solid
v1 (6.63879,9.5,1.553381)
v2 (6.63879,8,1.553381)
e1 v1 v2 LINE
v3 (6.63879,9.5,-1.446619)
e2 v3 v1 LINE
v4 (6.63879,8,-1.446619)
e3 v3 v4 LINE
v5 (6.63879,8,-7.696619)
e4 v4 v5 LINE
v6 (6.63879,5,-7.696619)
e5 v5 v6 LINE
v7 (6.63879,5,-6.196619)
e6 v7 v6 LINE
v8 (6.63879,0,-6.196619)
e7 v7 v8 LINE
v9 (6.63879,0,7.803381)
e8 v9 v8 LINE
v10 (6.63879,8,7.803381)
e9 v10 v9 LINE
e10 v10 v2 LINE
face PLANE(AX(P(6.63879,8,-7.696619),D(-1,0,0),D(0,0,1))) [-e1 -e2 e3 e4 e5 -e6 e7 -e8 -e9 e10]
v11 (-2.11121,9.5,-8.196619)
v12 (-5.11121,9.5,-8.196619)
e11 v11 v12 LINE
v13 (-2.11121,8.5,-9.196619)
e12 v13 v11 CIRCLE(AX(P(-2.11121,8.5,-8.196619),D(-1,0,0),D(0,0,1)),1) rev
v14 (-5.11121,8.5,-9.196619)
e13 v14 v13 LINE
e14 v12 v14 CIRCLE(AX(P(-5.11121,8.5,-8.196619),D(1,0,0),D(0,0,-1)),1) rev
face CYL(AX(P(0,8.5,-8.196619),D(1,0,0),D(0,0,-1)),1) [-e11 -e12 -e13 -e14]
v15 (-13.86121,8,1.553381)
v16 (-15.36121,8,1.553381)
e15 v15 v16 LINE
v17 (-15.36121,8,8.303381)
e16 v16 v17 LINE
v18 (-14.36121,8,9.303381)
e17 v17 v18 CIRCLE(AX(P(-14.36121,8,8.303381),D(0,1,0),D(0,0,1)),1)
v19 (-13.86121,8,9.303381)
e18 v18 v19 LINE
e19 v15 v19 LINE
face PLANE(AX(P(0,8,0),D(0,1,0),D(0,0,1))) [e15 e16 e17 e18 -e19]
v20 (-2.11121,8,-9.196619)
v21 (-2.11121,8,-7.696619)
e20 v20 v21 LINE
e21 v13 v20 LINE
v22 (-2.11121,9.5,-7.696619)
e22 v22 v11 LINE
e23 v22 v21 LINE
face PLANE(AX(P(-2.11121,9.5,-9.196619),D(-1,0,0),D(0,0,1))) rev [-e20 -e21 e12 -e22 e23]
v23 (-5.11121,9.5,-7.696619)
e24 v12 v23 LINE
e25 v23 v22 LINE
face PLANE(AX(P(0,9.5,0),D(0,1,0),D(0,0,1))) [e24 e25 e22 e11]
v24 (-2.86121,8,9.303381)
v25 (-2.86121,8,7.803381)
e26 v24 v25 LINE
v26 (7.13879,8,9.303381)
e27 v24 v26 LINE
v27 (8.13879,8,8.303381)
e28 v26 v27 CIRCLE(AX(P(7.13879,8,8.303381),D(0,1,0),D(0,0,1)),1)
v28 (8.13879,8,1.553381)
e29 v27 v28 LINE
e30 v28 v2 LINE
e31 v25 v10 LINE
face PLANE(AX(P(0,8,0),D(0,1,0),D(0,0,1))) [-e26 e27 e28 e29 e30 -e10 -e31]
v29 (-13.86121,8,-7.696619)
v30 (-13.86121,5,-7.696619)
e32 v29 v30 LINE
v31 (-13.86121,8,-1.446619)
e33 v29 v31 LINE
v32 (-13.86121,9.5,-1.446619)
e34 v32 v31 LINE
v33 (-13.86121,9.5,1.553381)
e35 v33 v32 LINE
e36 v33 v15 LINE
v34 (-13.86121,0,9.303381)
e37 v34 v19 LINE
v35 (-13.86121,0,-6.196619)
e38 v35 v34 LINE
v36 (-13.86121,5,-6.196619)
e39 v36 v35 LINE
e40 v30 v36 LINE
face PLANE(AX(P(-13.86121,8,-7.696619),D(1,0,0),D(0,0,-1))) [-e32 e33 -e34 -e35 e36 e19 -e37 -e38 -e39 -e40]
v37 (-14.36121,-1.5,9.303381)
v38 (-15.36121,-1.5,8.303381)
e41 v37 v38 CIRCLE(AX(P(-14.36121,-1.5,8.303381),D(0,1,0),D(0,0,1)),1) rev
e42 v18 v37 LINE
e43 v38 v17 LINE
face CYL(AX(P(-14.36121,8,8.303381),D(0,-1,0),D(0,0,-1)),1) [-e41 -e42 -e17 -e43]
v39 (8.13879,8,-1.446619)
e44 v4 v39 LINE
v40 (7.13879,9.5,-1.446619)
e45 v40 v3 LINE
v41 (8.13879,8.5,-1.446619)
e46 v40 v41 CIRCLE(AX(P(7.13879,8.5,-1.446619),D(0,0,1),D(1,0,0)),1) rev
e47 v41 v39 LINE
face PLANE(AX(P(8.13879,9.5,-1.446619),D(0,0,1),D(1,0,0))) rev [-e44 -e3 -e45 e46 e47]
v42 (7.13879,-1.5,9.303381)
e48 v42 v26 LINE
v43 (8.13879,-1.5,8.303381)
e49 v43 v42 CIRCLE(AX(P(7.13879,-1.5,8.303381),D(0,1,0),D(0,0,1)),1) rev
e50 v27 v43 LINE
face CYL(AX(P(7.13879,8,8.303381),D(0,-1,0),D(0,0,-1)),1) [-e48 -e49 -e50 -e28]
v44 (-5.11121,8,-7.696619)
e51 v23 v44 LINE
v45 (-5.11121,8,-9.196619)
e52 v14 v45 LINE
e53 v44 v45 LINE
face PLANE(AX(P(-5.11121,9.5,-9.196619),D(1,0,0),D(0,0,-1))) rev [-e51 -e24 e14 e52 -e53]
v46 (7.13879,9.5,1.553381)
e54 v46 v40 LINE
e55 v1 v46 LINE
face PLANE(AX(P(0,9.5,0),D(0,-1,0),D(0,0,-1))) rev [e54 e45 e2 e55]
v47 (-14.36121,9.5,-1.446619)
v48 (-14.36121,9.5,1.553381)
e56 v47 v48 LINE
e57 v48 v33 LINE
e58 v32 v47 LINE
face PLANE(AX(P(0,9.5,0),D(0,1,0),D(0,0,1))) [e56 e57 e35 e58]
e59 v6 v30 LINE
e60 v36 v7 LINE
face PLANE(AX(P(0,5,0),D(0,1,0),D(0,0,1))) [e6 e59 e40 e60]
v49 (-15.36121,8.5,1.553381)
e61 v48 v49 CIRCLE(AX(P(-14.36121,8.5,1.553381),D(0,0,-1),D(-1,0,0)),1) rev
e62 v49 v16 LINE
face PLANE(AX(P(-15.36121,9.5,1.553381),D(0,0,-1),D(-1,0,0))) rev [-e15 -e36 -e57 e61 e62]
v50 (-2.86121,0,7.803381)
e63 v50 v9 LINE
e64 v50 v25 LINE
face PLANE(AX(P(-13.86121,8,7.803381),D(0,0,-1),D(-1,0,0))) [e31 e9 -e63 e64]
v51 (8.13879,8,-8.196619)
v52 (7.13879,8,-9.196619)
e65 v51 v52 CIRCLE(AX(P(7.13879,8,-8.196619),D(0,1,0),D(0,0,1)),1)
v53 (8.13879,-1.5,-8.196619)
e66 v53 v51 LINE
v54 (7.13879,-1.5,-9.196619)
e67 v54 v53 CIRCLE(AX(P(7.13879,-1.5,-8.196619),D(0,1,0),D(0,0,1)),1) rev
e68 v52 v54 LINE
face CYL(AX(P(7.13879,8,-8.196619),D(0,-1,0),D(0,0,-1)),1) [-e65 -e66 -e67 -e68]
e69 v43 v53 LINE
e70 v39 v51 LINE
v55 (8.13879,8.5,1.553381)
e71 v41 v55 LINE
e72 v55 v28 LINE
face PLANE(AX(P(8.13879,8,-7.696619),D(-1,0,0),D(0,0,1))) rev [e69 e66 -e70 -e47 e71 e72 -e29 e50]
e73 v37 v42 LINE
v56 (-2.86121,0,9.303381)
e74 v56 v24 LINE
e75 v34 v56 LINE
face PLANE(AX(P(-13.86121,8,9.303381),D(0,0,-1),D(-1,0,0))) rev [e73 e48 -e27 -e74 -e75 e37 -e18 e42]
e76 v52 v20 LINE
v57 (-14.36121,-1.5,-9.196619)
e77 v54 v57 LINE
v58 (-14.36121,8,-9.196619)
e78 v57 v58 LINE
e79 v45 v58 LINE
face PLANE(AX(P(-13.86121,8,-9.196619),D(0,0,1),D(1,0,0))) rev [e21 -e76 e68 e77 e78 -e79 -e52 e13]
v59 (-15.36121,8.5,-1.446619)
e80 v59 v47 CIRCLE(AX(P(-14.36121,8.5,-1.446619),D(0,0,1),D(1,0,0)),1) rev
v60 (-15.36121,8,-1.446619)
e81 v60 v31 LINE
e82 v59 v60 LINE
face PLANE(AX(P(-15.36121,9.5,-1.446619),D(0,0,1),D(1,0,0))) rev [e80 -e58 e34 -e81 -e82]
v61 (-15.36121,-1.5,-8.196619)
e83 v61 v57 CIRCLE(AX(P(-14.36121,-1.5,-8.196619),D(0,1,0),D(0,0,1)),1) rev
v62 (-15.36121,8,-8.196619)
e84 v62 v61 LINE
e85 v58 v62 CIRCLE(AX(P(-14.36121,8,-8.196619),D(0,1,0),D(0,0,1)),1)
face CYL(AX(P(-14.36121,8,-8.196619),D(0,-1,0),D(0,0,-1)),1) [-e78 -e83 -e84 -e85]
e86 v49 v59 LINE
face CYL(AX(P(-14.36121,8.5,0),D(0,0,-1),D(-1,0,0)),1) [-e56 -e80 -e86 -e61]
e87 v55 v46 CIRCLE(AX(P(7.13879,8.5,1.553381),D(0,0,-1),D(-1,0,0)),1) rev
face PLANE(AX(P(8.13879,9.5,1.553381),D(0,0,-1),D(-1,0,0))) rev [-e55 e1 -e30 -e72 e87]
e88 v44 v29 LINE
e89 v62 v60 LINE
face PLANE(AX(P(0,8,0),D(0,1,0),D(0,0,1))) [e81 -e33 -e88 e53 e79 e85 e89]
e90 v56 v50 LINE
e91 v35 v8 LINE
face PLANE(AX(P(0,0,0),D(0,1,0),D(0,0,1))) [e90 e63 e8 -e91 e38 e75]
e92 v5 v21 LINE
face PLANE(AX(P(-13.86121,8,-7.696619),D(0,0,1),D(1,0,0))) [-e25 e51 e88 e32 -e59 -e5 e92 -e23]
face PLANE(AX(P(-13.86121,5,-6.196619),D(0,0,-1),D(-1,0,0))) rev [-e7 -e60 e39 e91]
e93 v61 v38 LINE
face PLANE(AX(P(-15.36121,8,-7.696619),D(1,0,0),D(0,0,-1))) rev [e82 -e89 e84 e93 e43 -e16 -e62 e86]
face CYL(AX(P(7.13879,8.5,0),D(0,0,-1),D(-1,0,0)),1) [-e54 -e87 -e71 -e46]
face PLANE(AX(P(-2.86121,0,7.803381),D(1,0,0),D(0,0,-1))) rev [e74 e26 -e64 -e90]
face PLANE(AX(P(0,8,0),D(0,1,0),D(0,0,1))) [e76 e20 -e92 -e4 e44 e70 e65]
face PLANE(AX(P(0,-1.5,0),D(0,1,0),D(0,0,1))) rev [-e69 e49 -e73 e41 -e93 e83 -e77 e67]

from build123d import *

# Parameters (mm, degrees)
SKETCH1_W                 = 20.5
SKETCH1_H                 = 15.5
BOSS_EXTRUDE1_DEPTH       = 8
SHELL1_T                  = 1.5
BOSS_EXTRUDE2_START       = 8
BOSS_EXTRUDE2_OUTLINE_W   = 1.5
BOSS_EXTRUDE2_OUTLINE_H   = 3
BOSS_EXTRUDE2_OUTLINE_W_2 = 3
BOSS_EXTRUDE2_OUTLINE_H_2 = 1.5
BOSS_EXTRUDE2_DEPTH       = 1.5
SKETCH3_W                 = 10
SKETCH3_H                 = 1.5
CUT_EXTRUDE1_DEPTH        = 8
SKETCH4_W                 = 20.5
SKETCH4_H                 = 1.5
BOSS_EXTRUDE3_DEPTH       = 5
FILLET1_R                 = 1
FILLET2_R                 = 1
FILLET3_R                 = 1
SKETCH5_W                 = 1
SKETCH5_H                 = 1.5
CUT_EXTRUDE3_DEPTH        = 8


# Read off the part's stored shape, not the designer's step: Boss-Extrude2
with BuildPart() as part:
    # Sketch1 → Boss-Extrude1 (new body)
    with BuildSketch(Plane(origin=(0, 0, 0), x_dir=(1, 0, 0), z_dir=(0, 1, 0))):
        with Locations((-3.611209964, -0.053380783)):
            Rectangle(SKETCH1_W, SKETCH1_H)
    extrude(amount=BOSS_EXTRUDE1_DEPTH)

    # Shell1
    shell1_openings = [part.faces().sort_by_distance(p)[0] for p in [
        (-3.611209964, 8, 0.053380783),
    ]]
    offset(amount=SHELL1_T, openings=shell1_openings, kind=Kind.INTERSECTION)

    # Boss-Extrude2 outline → Boss-Extrude2 (add)
    with BuildSketch(Plane(origin=(0, 0, 0), x_dir=(1, 0, 0), z_dir=(0, 1, 0)).offset(BOSS_EXTRUDE2_START)):
        with Locations((-14.611209964, -0.053380783)):
            Rectangle(BOSS_EXTRUDE2_OUTLINE_W, BOSS_EXTRUDE2_OUTLINE_H)
        with Locations((-3.611209964, 8.446619217)):
            Rectangle(BOSS_EXTRUDE2_OUTLINE_W_2, BOSS_EXTRUDE2_OUTLINE_H_2)
        with Locations((7.388790036, -0.053380783)):
            Rectangle(BOSS_EXTRUDE2_OUTLINE_W, BOSS_EXTRUDE2_OUTLINE_H)
    extrude(amount=BOSS_EXTRUDE2_DEPTH)

    # Sketch3 → Cut-Extrude1 (cut)
    with BuildSketch(Plane(origin=(0, 8, 0), x_dir=(1, 0, 0), z_dir=(0, 1, 0))):
        with Locations((-8.861209964, -8.553380783)):
            Rectangle(SKETCH3_W, SKETCH3_H)
    extrude(amount=-CUT_EXTRUDE1_DEPTH, mode=Mode.SUBTRACT)

    # Sketch4 → Boss-Extrude3 (add)
    with BuildSketch(Plane(origin=(0, 0, 0), x_dir=(1, 0, 0), z_dir=(0, 1, 0))):
        with Locations((-3.611209964, 6.946619217)):
            Rectangle(SKETCH4_W, SKETCH4_H)
    extrude(amount=BOSS_EXTRUDE3_DEPTH)

    # Fillet1
    fillet1_edges = [part.edges().sort_by_distance(p)[0] for p in [
        (-15.361209964, 9.5, 0.053380783),
    ]]
    fillet(fillet1_edges, radius=FILLET1_R)

    # Fillet2
    fillet2_edges = [part.edges().sort_by_distance(p)[0] for p in [
        (-3.611209964, 9.5, -9.196619217),
        (8.138790036, 9.5, 0.053380783),
    ]]
    fillet(fillet2_edges, radius=FILLET2_R)

    # Fillet3
    fillet3_edges = [part.edges().sort_by_distance(p)[0] for p in [
        (-15.361209964, 3.25, -9.196619217),
        (8.138790036, 3.25, -9.196619217),
        (8.138790036, 3.25, 9.303380783),
        (-15.361209964, 3.25, 9.303380783),
    ]]
    fillet(fillet3_edges, radius=FILLET3_R)

    # Sketch5 → Cut-Extrude3 (cut)
    with BuildSketch(Plane(origin=(0, 8, 0), x_dir=(1, 0, 0), z_dir=(0, 1, 0))):
        with Locations((-3.361209964, -8.553380783)):
            Rectangle(SKETCH5_W, SKETCH5_H)
    extrude(amount=-CUT_EXTRUDE3_DEPTH, mode=Mode.SUBTRACT)


solid = part.part
